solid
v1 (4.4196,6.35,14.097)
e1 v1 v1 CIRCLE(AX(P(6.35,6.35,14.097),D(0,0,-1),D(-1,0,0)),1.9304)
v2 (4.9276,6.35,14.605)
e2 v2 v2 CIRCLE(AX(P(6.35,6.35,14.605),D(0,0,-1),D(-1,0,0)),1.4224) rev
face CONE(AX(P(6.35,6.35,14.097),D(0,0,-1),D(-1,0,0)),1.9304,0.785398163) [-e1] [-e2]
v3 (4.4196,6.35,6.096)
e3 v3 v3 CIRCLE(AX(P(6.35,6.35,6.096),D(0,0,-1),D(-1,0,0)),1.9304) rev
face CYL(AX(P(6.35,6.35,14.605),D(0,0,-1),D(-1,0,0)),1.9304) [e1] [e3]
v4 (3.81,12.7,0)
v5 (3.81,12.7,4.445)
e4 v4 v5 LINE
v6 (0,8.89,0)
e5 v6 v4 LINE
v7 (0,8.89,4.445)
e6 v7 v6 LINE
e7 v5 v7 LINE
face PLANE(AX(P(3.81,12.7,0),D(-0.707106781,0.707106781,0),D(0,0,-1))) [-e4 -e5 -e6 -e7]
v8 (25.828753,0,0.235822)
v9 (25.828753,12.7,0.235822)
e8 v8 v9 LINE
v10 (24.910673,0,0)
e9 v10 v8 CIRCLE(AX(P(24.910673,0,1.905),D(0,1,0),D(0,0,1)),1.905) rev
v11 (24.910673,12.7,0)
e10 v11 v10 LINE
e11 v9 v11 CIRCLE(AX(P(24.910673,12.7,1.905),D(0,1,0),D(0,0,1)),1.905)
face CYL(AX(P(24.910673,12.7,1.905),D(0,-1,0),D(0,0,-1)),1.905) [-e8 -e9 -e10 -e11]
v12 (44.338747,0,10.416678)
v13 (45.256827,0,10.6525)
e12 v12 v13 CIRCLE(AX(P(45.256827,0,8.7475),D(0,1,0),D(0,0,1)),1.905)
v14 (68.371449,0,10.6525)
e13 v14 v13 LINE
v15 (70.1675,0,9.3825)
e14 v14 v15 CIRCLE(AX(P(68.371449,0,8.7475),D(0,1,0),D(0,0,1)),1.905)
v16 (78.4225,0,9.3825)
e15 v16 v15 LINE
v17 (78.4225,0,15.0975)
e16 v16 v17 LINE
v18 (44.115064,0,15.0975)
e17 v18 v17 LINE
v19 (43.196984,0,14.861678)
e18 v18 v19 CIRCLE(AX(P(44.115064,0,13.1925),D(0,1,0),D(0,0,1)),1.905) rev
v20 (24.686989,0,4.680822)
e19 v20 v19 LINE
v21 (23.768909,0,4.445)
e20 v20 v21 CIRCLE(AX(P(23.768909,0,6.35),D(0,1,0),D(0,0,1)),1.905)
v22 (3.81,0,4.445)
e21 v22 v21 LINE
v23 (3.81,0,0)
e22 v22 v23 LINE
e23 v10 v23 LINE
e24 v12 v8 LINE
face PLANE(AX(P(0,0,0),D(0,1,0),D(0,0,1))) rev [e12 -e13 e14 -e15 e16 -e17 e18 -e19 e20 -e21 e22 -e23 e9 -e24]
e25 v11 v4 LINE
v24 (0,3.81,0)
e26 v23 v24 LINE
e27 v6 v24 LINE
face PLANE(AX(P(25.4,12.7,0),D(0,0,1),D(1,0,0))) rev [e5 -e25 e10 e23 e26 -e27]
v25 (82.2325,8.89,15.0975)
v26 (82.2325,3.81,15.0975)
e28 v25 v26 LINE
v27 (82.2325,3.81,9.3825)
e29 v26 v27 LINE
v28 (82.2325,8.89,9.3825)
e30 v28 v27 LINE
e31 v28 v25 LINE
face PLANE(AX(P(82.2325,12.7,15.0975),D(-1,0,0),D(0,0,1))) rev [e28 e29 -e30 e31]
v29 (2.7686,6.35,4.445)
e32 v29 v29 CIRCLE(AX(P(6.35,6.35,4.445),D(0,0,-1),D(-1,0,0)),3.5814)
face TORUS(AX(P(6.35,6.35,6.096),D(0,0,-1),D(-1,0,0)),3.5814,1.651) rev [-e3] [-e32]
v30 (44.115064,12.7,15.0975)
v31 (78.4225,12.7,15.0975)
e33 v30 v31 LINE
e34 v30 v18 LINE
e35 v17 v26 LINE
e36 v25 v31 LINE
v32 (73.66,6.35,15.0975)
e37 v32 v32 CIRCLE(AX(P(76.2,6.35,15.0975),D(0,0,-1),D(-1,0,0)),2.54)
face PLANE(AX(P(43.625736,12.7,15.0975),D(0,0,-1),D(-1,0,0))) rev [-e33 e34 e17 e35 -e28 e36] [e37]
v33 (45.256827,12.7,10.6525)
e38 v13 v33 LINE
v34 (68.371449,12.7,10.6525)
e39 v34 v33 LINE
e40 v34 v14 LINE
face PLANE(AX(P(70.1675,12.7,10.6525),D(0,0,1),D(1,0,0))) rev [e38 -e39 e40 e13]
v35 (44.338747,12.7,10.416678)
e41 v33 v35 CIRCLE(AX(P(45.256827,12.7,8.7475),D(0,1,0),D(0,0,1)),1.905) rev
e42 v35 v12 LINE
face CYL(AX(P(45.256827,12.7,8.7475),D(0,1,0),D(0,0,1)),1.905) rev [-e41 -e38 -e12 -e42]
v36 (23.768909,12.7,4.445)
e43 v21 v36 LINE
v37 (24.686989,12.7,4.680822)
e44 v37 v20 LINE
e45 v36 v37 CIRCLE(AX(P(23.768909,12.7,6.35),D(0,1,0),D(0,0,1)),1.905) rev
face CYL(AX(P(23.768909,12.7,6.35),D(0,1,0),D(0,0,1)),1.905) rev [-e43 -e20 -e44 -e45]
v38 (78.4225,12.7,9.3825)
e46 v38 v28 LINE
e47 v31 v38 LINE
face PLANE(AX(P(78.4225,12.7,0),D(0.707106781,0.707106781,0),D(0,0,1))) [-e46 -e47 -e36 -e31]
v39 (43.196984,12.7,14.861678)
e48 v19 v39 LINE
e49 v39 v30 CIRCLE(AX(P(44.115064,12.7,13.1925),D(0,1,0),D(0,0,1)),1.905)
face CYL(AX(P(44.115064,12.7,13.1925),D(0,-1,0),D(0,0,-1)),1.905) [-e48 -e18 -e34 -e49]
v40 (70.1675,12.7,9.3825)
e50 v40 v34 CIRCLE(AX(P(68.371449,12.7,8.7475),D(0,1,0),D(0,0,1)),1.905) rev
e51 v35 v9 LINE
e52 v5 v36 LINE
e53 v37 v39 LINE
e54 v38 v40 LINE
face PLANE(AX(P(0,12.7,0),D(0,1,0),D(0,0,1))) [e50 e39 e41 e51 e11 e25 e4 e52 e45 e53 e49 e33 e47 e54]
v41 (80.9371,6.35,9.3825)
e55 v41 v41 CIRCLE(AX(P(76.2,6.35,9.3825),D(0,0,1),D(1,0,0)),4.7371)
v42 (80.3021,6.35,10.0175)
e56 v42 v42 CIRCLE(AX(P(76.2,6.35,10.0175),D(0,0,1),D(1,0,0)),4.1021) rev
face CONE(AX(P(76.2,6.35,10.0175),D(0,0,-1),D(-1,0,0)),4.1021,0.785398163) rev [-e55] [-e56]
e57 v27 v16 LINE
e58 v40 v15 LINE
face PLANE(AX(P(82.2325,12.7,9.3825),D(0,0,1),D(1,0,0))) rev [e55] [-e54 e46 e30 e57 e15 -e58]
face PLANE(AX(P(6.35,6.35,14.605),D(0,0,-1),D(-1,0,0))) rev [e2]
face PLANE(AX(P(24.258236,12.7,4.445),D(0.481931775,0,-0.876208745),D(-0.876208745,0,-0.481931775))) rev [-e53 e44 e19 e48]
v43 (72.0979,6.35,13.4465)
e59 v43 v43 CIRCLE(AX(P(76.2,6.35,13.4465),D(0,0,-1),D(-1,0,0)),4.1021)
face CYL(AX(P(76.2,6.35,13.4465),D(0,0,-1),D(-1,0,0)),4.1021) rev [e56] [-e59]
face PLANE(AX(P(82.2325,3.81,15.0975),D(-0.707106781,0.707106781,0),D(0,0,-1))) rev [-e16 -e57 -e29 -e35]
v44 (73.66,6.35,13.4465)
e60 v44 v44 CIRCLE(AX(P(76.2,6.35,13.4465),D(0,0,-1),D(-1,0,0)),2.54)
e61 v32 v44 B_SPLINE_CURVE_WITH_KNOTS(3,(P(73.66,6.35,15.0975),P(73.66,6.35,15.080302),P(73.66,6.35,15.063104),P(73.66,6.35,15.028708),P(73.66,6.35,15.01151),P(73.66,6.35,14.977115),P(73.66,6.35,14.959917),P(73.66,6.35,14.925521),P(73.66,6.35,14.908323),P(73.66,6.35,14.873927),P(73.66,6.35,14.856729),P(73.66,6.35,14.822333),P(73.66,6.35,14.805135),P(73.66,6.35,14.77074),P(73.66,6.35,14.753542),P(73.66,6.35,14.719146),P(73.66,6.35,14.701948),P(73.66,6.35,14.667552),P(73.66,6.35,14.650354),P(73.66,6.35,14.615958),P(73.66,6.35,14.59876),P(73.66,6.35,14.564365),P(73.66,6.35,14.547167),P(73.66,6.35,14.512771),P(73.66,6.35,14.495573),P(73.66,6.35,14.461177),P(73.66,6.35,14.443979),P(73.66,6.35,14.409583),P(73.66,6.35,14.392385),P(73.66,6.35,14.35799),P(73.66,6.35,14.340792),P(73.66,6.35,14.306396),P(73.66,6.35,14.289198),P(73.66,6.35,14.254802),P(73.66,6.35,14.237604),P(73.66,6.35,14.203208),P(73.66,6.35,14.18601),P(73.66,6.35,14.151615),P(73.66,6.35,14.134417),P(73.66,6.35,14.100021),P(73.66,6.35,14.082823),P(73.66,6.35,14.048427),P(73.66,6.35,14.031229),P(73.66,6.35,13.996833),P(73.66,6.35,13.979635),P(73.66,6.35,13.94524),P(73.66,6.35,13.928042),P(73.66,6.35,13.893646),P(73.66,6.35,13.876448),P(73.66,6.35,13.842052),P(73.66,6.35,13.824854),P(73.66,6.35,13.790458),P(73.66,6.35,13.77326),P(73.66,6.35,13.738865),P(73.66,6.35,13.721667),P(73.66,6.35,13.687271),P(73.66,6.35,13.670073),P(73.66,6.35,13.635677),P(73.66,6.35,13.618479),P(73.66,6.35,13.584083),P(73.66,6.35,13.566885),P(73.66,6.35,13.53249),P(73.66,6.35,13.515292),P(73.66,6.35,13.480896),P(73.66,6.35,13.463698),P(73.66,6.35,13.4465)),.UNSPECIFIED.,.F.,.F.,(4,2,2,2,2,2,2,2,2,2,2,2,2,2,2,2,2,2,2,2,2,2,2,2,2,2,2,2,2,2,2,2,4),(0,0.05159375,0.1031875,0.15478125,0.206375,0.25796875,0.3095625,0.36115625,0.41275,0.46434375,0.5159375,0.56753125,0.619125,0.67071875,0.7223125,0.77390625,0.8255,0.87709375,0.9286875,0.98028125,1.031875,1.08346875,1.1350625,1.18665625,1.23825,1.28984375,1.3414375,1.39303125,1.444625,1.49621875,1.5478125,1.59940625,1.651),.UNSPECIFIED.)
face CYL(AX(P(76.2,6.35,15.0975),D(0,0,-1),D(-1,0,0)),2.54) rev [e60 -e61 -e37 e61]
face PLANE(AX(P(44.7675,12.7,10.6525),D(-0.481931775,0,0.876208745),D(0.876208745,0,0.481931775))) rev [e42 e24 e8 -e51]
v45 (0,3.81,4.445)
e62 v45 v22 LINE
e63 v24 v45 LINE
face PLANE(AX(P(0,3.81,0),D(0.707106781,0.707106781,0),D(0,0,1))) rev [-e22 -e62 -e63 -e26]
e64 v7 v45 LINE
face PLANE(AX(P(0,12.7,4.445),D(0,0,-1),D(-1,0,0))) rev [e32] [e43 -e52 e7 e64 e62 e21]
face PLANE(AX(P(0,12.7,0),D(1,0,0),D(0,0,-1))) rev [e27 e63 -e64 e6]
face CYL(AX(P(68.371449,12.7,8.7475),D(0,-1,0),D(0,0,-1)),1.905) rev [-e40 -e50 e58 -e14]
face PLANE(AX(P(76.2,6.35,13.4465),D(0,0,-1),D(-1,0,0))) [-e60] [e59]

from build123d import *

# Parameters (mm, degrees)
BOSS_EXTRUDE1_DEPTH = 12.7
SKETCH2_R           = 4.1021
CUT_EXTRUDE1_DEPTH  = 4.064
SKETCH3_R           = 2.54
CUT_EXTRUDE2_DEPTH  = 85.28690538
SKETCH4_R           = 1.9304
BOSS_EXTRUDE2_DEPTH = 10.16
FILLET1_R           = 1.651
CHAMFER1_SIZE       = 3.81
FILLET2_R           = 1.905
CHAMFER2_SIZE       = 0.635
CHAMFER3_SIZE       = 0.508


with BuildPart() as part:
    # Sketch1 → Boss-Extrude1 (new body)
    with BuildSketch(Plane(origin=(0, 0, 0), x_dir=(1, 0, 0), z_dir=(0, 1, 0))):
        Polygon((0, 0), (0, -4.445), (24.258236459, -4.445), (43.625736459, -15.0975), (82.2325, -15.0975), (82.2325, -9.3825), (70.1675, -9.3825), (70.1675, -10.6525), (44.7675, -10.6525), (25.4, 0), align=None)
    extrude(amount=BOSS_EXTRUDE1_DEPTH)

    # Sketch2 → Cut-Extrude1 (cut)
    with BuildSketch(Plane(origin=(0, 0, 9.3825), x_dir=(-1, 0, 0), z_dir=(0, 0, -1))):
        with Locations((-76.2, 6.35)):
            Circle(SKETCH2_R)
    extrude(amount=-CUT_EXTRUDE1_DEPTH, mode=Mode.SUBTRACT)

    # Sketch3 → Cut-Extrude2 (cut, through all)
    with BuildSketch(Plane(origin=(0, 0, 13.4465), x_dir=(-1, 0, 0), z_dir=(0, 0, -1))):
        with Locations((-76.2, 6.35)):
            Circle(SKETCH3_R)
    extrude(amount=-CUT_EXTRUDE2_DEPTH, mode=Mode.SUBTRACT)

    # Sketch4 → Boss-Extrude2 (add)
    with BuildSketch(Plane(origin=(0, 0, 4.445), x_dir=(-1, 0, 0), z_dir=(0, 0, -1))):
        with Locations((-6.35, 6.35)):
            Circle(SKETCH4_R)
    extrude(amount=-BOSS_EXTRUDE2_DEPTH)

    # Fillet1
    fillet1_edges = [part.edges().sort_by_distance(p)[0] for p in [
        (8.2804, 6.35, 4.445),
    ]]
    fillet(fillet1_edges, radius=FILLET1_R)

    # Chamfer1
    chamfer1_edges = [part.edges().sort_by_distance(p)[0] for p in [
        (82.2325, 0, 12.24),
        (0, 0, 2.2225),
        (82.2325, 12.7, 12.24),
        (0, 12.7, 2.2225),
    ]]
    chamfer(chamfer1_edges, length=CHAMFER1_SIZE)

    # Fillet2
    # the kernel refuses this fillet: 1.905 mm, written as the material it adds along each edge
    with BuildSketch(Plane(origin=(24.258236459, 0, 4.445), x_dir=(-1, 0, 0), z_dir=(0, 1, 0))) as fillet2_piece_1:
        with BuildLine():
            CenterArc((FILLET2_R * 0.256864688635, FILLET2_R), FILLET2_R, 241.188354533, 28.811645467)
            Line((-FILLET2_R * 0.225067086378, FILLET2_R * 0.123791255332), (0, 0))
            Line((0, 0), (FILLET2_R * 0.256864688635, 0))
        make_face()
    extrude(amount=12.7)
    with BuildSketch(Plane(origin=(44.7675, 0, 10.6525), x_dir=(-0.8762087446678116, 0, -0.4819317750134946), z_dir=(0, 1, 0))) as fillet2_piece_2:
        with BuildLine():
            CenterArc((FILLET2_R * 0.256864688635, -FILLET2_R), FILLET2_R, 90, 28.811645467)
            Line((-FILLET2_R * 0.225067086378, -FILLET2_R * 0.123791255332), (0, 0))
            Line((0, 0), (FILLET2_R * 0.256864688635, 0))
        make_face()
    extrude(amount=12.7)
    with BuildSketch(Plane(origin=(70.1675, 0, 10.6525), x_dir=(-1, 0, 0), z_dir=(0, 1, 0))) as fillet2_piece_3:
        with BuildLine():
            CenterArc((1.796051224, -1.905), FILLET2_R, 90, 70.528779366)
            Line((0, -1.27), (0, 0))
            Line((0, 0), (1.796051224, 0))
        make_face()
    extrude(amount=12.7)
    # the kernel refuses this fillet: 1.905 mm, written as the material it takes off along each edge
    with BuildSketch(Plane(origin=(43.625736459, -1.22331808, 15.0975), x_dir=(-0.8762087446678133, 0, -0.4819317750134918), z_dir=(0, 1, 0))) as fillet2_2_piece_1:
        with BuildLine():
            CenterArc((FILLET2_R * 0.256864688635, -FILLET2_R), FILLET2_R, 90, 28.811645467)
            Line((-FILLET2_R * 0.225067086378, -FILLET2_R * 0.123791255332), (0, 0))
            Line((0, 0), (FILLET2_R * 0.256864688635, 0))
        make_face()
    extrude(amount=15.146636159, mode=Mode.SUBTRACT)
    with BuildSketch(Plane(origin=(25.4, -1.22331808, 0), x_dir=(-1, 0, 0), z_dir=(0, 1, 0))) as fillet2_2_piece_2:
        with BuildLine():
            CenterArc((FILLET2_R * 0.256864688635, FILLET2_R), FILLET2_R, 241.188354533, 28.811645467)
            Line((-FILLET2_R * 0.225067086378, FILLET2_R * 0.123791255332), (0, 0))
            Line((0, 0), (FILLET2_R * 0.256864688635, 0))
        make_face()
    extrude(amount=15.146636159, mode=Mode.SUBTRACT)

    # Chamfer2
    chamfer2_edges = [part.edges().sort_by_distance(p)[0] for p in [
        (80.3021, 6.35, 9.3825),
    ]]
    chamfer(chamfer2_edges, length=CHAMFER2_SIZE)

    # Chamfer3
    chamfer3_edges = [part.edges().sort_by_distance(p)[0] for p in [
        (8.2804, 6.35, 14.605),
    ]]
    chamfer(chamfer3_edges, length=CHAMFER3_SIZE)


solid = part.part
